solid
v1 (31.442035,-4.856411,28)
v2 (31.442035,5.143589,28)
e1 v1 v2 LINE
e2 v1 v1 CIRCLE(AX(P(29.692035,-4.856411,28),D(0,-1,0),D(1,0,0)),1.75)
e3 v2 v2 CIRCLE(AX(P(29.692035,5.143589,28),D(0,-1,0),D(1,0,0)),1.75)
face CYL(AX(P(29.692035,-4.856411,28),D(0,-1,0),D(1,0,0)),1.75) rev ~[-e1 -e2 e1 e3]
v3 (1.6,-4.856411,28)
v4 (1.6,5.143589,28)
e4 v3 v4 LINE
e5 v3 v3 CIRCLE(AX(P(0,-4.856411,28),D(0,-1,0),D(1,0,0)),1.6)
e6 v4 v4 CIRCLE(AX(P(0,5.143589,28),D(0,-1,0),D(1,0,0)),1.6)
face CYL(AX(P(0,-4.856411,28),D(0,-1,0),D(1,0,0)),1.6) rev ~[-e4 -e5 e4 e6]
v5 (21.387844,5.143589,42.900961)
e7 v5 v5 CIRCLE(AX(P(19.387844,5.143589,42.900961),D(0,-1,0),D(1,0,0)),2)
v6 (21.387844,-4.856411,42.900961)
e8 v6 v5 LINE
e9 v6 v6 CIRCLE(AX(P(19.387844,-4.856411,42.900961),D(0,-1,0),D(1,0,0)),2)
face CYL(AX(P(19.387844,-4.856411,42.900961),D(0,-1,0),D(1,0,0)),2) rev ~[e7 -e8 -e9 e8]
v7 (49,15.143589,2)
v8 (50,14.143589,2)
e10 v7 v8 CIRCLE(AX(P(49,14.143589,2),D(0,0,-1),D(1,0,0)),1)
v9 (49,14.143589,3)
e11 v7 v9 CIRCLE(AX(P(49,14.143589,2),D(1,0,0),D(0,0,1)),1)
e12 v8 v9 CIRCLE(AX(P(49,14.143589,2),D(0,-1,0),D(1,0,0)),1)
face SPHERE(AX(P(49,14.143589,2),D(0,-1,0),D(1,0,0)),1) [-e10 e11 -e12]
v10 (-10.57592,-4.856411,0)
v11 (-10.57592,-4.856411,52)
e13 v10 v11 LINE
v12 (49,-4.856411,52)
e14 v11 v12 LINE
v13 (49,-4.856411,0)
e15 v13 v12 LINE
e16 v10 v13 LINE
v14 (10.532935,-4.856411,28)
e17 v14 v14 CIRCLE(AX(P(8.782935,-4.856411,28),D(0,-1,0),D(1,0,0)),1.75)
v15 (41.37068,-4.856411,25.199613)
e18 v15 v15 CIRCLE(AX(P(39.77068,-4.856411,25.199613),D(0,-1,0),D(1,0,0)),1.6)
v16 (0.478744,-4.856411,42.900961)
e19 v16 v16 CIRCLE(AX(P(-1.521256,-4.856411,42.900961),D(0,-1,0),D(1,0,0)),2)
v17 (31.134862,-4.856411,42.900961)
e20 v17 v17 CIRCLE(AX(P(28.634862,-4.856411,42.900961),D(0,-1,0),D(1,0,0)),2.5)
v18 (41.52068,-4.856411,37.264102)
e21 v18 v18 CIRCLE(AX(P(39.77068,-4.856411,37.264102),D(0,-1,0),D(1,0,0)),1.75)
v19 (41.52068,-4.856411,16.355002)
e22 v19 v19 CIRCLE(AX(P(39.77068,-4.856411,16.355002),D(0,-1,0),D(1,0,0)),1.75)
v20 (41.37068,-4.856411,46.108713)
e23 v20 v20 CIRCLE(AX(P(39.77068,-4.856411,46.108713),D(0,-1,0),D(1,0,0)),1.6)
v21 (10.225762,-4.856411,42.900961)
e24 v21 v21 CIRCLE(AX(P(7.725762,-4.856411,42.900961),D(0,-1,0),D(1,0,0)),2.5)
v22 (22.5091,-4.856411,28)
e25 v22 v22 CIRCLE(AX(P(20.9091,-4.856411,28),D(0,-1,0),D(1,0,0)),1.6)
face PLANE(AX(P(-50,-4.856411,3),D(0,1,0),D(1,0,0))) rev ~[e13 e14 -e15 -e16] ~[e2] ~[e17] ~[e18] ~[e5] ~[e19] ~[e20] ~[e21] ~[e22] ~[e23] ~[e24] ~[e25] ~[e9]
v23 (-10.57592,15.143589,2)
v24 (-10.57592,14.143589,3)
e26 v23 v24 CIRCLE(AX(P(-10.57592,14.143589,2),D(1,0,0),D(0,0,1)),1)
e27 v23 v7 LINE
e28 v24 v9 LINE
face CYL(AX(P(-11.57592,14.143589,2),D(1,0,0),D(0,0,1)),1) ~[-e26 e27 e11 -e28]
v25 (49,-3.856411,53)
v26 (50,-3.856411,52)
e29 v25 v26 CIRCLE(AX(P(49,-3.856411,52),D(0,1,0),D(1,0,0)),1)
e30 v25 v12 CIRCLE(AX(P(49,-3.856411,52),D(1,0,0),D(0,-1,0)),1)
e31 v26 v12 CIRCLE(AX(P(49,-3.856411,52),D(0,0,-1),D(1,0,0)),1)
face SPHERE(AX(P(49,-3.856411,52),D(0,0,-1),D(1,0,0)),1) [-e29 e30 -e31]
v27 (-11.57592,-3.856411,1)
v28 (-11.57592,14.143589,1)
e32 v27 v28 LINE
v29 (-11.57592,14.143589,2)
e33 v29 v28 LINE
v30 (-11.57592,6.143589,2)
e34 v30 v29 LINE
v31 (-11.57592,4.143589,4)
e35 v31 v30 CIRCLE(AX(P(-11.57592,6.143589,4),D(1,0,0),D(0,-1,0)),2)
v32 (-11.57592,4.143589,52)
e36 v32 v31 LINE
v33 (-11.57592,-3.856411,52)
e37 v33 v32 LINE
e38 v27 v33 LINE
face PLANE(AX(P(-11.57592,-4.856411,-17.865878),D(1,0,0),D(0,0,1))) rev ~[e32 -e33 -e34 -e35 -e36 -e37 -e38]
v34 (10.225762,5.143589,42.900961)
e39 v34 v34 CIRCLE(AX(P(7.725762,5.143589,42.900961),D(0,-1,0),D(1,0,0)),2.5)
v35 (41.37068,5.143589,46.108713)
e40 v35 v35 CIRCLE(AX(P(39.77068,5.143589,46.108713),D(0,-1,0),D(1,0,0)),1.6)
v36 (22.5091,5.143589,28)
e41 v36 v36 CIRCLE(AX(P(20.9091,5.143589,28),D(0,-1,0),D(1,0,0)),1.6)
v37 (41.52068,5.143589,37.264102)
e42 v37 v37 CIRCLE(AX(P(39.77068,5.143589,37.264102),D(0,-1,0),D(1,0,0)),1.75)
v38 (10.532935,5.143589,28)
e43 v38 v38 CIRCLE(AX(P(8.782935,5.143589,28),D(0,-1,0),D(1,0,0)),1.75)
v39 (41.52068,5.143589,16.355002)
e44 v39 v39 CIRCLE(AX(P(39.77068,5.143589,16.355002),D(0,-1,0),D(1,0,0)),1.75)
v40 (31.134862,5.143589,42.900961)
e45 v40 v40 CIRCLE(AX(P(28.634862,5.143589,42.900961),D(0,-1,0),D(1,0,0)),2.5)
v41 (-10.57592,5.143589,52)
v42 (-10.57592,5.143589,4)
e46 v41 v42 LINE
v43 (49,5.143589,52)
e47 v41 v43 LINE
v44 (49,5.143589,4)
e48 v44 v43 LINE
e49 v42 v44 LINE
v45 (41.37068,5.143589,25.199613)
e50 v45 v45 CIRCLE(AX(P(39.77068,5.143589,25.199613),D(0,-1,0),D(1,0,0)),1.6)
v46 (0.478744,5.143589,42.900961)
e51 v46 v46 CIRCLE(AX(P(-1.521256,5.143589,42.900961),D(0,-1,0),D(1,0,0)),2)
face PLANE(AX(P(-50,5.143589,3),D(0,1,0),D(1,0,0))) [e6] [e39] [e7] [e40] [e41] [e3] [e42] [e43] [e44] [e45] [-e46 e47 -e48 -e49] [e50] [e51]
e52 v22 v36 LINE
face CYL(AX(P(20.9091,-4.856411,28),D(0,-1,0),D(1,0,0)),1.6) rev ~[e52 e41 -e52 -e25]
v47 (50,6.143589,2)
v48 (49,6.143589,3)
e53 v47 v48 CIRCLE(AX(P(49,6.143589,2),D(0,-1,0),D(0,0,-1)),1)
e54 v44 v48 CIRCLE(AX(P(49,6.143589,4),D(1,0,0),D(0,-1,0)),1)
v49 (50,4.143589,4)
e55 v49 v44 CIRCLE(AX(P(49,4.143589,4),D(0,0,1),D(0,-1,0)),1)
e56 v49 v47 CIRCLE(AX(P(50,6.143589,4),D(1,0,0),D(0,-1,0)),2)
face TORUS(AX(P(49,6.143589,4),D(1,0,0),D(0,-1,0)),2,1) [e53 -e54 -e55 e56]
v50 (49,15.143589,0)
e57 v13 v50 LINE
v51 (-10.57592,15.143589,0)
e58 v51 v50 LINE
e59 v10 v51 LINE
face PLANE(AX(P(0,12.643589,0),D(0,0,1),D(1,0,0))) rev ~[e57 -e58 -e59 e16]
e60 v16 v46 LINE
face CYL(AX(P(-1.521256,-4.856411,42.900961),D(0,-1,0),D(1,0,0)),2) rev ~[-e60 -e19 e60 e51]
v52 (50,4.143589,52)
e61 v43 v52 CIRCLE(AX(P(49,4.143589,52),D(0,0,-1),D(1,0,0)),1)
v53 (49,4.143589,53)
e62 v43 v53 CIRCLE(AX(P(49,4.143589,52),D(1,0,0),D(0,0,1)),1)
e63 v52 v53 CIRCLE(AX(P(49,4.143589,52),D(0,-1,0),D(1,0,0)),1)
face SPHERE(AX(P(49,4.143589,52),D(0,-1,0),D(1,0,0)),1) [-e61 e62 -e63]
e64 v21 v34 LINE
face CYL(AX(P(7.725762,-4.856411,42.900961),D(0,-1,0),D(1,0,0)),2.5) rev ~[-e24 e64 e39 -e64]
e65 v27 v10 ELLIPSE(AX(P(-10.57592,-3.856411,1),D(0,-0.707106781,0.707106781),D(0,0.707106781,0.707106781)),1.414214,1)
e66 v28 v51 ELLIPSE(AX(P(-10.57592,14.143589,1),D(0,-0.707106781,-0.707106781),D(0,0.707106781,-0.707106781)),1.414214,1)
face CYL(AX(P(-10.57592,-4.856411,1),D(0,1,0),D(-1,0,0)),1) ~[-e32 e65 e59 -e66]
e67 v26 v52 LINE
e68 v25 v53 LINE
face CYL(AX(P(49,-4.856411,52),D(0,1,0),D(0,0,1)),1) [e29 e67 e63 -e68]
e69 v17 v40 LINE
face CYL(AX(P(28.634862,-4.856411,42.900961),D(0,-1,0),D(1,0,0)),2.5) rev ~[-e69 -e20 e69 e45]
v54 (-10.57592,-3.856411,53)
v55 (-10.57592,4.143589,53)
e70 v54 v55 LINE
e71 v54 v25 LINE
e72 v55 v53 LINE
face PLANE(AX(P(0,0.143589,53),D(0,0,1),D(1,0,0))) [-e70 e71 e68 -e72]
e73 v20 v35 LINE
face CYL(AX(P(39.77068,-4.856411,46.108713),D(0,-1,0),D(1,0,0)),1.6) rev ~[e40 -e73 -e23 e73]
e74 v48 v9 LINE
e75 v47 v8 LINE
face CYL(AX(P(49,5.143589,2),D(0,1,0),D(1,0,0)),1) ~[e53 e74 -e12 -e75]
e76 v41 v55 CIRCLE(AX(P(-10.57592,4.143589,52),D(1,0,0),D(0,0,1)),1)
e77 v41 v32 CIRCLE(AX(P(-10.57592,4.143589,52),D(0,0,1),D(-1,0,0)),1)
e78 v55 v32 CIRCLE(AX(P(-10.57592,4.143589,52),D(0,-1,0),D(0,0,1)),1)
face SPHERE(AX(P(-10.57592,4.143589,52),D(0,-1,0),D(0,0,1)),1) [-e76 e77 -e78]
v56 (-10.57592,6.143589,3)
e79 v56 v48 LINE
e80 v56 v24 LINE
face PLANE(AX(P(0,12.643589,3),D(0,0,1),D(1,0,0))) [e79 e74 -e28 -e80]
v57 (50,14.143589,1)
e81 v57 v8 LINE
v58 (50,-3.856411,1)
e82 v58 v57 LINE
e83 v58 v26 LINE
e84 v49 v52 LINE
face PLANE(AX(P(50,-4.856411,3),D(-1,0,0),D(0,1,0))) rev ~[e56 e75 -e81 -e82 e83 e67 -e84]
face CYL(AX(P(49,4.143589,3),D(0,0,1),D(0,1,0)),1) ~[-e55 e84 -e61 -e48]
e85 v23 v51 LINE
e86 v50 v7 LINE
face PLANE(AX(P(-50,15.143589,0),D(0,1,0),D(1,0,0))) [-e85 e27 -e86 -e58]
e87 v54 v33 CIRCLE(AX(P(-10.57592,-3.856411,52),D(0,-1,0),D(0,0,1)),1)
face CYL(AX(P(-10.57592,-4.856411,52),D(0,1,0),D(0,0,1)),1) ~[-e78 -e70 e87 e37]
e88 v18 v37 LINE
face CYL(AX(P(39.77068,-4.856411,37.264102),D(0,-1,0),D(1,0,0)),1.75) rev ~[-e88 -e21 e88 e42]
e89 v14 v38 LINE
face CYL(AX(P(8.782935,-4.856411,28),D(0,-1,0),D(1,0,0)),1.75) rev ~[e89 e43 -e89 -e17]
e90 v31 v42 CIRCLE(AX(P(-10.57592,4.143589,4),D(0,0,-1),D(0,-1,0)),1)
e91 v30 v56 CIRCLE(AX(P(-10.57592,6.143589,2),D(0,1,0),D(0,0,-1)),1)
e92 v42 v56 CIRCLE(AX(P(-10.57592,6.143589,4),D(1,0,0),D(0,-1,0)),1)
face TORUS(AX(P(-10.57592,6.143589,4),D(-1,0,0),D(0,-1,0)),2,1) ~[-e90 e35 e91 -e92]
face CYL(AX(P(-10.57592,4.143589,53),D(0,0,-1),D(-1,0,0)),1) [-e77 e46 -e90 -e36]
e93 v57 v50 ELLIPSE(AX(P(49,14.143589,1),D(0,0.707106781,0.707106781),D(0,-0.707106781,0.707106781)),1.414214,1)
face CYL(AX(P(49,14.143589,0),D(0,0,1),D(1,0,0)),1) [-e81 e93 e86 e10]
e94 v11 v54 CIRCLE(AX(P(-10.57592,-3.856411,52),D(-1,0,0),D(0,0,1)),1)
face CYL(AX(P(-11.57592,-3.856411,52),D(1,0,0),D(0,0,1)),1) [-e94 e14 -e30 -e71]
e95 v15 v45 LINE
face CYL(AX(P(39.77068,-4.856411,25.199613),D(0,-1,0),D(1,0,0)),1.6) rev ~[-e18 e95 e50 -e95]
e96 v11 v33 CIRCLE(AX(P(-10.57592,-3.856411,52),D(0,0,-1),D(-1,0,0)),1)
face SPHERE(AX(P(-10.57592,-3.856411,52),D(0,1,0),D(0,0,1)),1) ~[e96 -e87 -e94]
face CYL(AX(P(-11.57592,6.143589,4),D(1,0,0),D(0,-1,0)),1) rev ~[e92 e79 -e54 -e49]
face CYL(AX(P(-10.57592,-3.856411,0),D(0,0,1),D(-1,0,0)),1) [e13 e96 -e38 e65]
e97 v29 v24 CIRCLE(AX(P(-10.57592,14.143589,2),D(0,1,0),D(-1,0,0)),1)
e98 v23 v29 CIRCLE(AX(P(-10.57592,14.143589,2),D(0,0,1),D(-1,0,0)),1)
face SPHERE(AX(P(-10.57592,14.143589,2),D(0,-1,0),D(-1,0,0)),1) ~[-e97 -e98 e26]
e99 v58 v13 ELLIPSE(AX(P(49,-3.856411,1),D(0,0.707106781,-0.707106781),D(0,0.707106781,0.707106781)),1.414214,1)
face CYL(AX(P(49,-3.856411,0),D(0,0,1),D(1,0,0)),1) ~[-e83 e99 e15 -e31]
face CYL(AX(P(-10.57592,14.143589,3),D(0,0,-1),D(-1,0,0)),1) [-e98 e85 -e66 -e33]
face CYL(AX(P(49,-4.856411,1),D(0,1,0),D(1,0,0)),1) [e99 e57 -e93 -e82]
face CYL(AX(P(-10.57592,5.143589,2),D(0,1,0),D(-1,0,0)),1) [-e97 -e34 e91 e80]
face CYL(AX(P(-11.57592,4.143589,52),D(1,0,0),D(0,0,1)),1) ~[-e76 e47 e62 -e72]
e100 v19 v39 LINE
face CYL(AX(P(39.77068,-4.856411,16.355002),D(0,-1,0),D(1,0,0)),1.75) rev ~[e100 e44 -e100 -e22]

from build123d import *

# Parameters (mm, degrees)
F0_W          = 100
F0_H          = 5
F1_DEPTH      = 3
F2_W          = 100
F2_H          = 10
F3_DEPTH      = 50
F4_R          = 1.6
F4_R_2        = 1.75
F4_R_3        = 2.5
F4_R_4        = 2
F5_DEPTH      = 50
F7_DEPTH      = 50
F7_DEPTH_BACK = 25
F8_R          = 1


with BuildPart() as f1:
    # F0 (on Top) → F1 (new body)
    with BuildSketch(Plane.XY):
        with Locations((0, 12.6435890049)):
            Rectangle(F0_W, F0_H)
        with Locations((0, 7.6435890049)):
            Rectangle(F0_W, F0_H)
        with Locations((0, 2.6435890049)):
            Rectangle(F0_W, F0_H)
        with Locations((0, -2.3564109951)):
            Rectangle(F0_W, F0_H)
    extrude(amount=F1_DEPTH)

    # F2 (on face) → F3 (join)
    with BuildSketch(Plane.XY.offset(3)):
        with Locations((0, 0.1435890049)):
            Rectangle(F2_W, F2_H)
    extrude(amount=F3_DEPTH)

    # F4 (on face) → F5 (cut)
    with BuildSketch(Plane.XZ.offset(4.8564109951)):
        with Locations((0, 28)):
            Circle(F4_R)
        with Locations((39.7706801567, 25.1996132218)):
            Circle(F4_R)
        with Locations((8.7829349406, 28)):
            Circle(F4_R_2)
        with Locations((39.7706801567, 37.2641024557)):
            Circle(F4_R_2)
        with Locations((20.9091, 28)):
            Circle(F4_R)
        with Locations((29.6920349406, 28)):
            Circle(F4_R_2)
        with Locations((39.7706801567, 46.1087132218)):
            Circle(F4_R)
        with Locations((39.7706801567, 16.3550024557)):
            Circle(F4_R_2)
        with Locations((7.7257619488, 42.9009612363)):
            Circle(F4_R_3)
        with Locations((28.6348619488, 42.9009612363)):
            Circle(F4_R_3)
        with Locations((-1.5212555765, 42.9009612363)):
            Circle(F4_R_4)
        with Locations((19.3878444235, 42.9009612363)):
            Circle(F4_R_4)
    extrude(amount=-F5_DEPTH, mode=Mode.SUBTRACT)

    # F6 (on face) → F7 (cut, two sides)
    with BuildSketch(Plane.XZ.offset(4.8564109951)) as f7_sk:
        Polygon((-50, 53), (-11.575919576, 53), (-11.575919576, 62.5623986125), (-61.6087988019, 62.5623986125), (-61.6087988019, -15.408792533), (-11.575919576, -17.8658775985), (-11.575919576, 0), (-50, 0), align=None)
        Polygon((-11.575919576, 0), (-11.575919576, 49.896787852), (-11.575919576, 53), (-50, 53), (-50, 0), align=None)
    extrude(amount=-F7_DEPTH, mode=Mode.SUBTRACT)
    extrude(f7_sk.sketch, amount=F7_DEPTH_BACK, mode=Mode.SUBTRACT)

    # F8
    f8_edges = [f1.edges().sort_by_distance(p)[0] for p in [
        (50, -4.856411, 26.5),
        (50, 0.143589, 53),
        (50, 5.143589, 28),
        (50, 10.143589, 3),
        (50, 15.143589, 1.5),
        (50, 5.143589, 0),
        (-11.57592, 0.143589, 53),
        (19.21204, 5.143589, 53),
        (19.21204, -4.856411, 53),
        (-11.57592, 5.143589, 0),
        (-11.57592, -4.856411, 26.5),
        (-11.57592, 5.143589, 28),
        (-11.57592, 10.143589, 3),
        (-11.57592, 15.143589, 1.5),
        (19.21204, 5.143589, 3),
        (19.21204, 15.143589, 3),
    ]]
    fillet(f8_edges, radius=F8_R)


solid = f1.part
